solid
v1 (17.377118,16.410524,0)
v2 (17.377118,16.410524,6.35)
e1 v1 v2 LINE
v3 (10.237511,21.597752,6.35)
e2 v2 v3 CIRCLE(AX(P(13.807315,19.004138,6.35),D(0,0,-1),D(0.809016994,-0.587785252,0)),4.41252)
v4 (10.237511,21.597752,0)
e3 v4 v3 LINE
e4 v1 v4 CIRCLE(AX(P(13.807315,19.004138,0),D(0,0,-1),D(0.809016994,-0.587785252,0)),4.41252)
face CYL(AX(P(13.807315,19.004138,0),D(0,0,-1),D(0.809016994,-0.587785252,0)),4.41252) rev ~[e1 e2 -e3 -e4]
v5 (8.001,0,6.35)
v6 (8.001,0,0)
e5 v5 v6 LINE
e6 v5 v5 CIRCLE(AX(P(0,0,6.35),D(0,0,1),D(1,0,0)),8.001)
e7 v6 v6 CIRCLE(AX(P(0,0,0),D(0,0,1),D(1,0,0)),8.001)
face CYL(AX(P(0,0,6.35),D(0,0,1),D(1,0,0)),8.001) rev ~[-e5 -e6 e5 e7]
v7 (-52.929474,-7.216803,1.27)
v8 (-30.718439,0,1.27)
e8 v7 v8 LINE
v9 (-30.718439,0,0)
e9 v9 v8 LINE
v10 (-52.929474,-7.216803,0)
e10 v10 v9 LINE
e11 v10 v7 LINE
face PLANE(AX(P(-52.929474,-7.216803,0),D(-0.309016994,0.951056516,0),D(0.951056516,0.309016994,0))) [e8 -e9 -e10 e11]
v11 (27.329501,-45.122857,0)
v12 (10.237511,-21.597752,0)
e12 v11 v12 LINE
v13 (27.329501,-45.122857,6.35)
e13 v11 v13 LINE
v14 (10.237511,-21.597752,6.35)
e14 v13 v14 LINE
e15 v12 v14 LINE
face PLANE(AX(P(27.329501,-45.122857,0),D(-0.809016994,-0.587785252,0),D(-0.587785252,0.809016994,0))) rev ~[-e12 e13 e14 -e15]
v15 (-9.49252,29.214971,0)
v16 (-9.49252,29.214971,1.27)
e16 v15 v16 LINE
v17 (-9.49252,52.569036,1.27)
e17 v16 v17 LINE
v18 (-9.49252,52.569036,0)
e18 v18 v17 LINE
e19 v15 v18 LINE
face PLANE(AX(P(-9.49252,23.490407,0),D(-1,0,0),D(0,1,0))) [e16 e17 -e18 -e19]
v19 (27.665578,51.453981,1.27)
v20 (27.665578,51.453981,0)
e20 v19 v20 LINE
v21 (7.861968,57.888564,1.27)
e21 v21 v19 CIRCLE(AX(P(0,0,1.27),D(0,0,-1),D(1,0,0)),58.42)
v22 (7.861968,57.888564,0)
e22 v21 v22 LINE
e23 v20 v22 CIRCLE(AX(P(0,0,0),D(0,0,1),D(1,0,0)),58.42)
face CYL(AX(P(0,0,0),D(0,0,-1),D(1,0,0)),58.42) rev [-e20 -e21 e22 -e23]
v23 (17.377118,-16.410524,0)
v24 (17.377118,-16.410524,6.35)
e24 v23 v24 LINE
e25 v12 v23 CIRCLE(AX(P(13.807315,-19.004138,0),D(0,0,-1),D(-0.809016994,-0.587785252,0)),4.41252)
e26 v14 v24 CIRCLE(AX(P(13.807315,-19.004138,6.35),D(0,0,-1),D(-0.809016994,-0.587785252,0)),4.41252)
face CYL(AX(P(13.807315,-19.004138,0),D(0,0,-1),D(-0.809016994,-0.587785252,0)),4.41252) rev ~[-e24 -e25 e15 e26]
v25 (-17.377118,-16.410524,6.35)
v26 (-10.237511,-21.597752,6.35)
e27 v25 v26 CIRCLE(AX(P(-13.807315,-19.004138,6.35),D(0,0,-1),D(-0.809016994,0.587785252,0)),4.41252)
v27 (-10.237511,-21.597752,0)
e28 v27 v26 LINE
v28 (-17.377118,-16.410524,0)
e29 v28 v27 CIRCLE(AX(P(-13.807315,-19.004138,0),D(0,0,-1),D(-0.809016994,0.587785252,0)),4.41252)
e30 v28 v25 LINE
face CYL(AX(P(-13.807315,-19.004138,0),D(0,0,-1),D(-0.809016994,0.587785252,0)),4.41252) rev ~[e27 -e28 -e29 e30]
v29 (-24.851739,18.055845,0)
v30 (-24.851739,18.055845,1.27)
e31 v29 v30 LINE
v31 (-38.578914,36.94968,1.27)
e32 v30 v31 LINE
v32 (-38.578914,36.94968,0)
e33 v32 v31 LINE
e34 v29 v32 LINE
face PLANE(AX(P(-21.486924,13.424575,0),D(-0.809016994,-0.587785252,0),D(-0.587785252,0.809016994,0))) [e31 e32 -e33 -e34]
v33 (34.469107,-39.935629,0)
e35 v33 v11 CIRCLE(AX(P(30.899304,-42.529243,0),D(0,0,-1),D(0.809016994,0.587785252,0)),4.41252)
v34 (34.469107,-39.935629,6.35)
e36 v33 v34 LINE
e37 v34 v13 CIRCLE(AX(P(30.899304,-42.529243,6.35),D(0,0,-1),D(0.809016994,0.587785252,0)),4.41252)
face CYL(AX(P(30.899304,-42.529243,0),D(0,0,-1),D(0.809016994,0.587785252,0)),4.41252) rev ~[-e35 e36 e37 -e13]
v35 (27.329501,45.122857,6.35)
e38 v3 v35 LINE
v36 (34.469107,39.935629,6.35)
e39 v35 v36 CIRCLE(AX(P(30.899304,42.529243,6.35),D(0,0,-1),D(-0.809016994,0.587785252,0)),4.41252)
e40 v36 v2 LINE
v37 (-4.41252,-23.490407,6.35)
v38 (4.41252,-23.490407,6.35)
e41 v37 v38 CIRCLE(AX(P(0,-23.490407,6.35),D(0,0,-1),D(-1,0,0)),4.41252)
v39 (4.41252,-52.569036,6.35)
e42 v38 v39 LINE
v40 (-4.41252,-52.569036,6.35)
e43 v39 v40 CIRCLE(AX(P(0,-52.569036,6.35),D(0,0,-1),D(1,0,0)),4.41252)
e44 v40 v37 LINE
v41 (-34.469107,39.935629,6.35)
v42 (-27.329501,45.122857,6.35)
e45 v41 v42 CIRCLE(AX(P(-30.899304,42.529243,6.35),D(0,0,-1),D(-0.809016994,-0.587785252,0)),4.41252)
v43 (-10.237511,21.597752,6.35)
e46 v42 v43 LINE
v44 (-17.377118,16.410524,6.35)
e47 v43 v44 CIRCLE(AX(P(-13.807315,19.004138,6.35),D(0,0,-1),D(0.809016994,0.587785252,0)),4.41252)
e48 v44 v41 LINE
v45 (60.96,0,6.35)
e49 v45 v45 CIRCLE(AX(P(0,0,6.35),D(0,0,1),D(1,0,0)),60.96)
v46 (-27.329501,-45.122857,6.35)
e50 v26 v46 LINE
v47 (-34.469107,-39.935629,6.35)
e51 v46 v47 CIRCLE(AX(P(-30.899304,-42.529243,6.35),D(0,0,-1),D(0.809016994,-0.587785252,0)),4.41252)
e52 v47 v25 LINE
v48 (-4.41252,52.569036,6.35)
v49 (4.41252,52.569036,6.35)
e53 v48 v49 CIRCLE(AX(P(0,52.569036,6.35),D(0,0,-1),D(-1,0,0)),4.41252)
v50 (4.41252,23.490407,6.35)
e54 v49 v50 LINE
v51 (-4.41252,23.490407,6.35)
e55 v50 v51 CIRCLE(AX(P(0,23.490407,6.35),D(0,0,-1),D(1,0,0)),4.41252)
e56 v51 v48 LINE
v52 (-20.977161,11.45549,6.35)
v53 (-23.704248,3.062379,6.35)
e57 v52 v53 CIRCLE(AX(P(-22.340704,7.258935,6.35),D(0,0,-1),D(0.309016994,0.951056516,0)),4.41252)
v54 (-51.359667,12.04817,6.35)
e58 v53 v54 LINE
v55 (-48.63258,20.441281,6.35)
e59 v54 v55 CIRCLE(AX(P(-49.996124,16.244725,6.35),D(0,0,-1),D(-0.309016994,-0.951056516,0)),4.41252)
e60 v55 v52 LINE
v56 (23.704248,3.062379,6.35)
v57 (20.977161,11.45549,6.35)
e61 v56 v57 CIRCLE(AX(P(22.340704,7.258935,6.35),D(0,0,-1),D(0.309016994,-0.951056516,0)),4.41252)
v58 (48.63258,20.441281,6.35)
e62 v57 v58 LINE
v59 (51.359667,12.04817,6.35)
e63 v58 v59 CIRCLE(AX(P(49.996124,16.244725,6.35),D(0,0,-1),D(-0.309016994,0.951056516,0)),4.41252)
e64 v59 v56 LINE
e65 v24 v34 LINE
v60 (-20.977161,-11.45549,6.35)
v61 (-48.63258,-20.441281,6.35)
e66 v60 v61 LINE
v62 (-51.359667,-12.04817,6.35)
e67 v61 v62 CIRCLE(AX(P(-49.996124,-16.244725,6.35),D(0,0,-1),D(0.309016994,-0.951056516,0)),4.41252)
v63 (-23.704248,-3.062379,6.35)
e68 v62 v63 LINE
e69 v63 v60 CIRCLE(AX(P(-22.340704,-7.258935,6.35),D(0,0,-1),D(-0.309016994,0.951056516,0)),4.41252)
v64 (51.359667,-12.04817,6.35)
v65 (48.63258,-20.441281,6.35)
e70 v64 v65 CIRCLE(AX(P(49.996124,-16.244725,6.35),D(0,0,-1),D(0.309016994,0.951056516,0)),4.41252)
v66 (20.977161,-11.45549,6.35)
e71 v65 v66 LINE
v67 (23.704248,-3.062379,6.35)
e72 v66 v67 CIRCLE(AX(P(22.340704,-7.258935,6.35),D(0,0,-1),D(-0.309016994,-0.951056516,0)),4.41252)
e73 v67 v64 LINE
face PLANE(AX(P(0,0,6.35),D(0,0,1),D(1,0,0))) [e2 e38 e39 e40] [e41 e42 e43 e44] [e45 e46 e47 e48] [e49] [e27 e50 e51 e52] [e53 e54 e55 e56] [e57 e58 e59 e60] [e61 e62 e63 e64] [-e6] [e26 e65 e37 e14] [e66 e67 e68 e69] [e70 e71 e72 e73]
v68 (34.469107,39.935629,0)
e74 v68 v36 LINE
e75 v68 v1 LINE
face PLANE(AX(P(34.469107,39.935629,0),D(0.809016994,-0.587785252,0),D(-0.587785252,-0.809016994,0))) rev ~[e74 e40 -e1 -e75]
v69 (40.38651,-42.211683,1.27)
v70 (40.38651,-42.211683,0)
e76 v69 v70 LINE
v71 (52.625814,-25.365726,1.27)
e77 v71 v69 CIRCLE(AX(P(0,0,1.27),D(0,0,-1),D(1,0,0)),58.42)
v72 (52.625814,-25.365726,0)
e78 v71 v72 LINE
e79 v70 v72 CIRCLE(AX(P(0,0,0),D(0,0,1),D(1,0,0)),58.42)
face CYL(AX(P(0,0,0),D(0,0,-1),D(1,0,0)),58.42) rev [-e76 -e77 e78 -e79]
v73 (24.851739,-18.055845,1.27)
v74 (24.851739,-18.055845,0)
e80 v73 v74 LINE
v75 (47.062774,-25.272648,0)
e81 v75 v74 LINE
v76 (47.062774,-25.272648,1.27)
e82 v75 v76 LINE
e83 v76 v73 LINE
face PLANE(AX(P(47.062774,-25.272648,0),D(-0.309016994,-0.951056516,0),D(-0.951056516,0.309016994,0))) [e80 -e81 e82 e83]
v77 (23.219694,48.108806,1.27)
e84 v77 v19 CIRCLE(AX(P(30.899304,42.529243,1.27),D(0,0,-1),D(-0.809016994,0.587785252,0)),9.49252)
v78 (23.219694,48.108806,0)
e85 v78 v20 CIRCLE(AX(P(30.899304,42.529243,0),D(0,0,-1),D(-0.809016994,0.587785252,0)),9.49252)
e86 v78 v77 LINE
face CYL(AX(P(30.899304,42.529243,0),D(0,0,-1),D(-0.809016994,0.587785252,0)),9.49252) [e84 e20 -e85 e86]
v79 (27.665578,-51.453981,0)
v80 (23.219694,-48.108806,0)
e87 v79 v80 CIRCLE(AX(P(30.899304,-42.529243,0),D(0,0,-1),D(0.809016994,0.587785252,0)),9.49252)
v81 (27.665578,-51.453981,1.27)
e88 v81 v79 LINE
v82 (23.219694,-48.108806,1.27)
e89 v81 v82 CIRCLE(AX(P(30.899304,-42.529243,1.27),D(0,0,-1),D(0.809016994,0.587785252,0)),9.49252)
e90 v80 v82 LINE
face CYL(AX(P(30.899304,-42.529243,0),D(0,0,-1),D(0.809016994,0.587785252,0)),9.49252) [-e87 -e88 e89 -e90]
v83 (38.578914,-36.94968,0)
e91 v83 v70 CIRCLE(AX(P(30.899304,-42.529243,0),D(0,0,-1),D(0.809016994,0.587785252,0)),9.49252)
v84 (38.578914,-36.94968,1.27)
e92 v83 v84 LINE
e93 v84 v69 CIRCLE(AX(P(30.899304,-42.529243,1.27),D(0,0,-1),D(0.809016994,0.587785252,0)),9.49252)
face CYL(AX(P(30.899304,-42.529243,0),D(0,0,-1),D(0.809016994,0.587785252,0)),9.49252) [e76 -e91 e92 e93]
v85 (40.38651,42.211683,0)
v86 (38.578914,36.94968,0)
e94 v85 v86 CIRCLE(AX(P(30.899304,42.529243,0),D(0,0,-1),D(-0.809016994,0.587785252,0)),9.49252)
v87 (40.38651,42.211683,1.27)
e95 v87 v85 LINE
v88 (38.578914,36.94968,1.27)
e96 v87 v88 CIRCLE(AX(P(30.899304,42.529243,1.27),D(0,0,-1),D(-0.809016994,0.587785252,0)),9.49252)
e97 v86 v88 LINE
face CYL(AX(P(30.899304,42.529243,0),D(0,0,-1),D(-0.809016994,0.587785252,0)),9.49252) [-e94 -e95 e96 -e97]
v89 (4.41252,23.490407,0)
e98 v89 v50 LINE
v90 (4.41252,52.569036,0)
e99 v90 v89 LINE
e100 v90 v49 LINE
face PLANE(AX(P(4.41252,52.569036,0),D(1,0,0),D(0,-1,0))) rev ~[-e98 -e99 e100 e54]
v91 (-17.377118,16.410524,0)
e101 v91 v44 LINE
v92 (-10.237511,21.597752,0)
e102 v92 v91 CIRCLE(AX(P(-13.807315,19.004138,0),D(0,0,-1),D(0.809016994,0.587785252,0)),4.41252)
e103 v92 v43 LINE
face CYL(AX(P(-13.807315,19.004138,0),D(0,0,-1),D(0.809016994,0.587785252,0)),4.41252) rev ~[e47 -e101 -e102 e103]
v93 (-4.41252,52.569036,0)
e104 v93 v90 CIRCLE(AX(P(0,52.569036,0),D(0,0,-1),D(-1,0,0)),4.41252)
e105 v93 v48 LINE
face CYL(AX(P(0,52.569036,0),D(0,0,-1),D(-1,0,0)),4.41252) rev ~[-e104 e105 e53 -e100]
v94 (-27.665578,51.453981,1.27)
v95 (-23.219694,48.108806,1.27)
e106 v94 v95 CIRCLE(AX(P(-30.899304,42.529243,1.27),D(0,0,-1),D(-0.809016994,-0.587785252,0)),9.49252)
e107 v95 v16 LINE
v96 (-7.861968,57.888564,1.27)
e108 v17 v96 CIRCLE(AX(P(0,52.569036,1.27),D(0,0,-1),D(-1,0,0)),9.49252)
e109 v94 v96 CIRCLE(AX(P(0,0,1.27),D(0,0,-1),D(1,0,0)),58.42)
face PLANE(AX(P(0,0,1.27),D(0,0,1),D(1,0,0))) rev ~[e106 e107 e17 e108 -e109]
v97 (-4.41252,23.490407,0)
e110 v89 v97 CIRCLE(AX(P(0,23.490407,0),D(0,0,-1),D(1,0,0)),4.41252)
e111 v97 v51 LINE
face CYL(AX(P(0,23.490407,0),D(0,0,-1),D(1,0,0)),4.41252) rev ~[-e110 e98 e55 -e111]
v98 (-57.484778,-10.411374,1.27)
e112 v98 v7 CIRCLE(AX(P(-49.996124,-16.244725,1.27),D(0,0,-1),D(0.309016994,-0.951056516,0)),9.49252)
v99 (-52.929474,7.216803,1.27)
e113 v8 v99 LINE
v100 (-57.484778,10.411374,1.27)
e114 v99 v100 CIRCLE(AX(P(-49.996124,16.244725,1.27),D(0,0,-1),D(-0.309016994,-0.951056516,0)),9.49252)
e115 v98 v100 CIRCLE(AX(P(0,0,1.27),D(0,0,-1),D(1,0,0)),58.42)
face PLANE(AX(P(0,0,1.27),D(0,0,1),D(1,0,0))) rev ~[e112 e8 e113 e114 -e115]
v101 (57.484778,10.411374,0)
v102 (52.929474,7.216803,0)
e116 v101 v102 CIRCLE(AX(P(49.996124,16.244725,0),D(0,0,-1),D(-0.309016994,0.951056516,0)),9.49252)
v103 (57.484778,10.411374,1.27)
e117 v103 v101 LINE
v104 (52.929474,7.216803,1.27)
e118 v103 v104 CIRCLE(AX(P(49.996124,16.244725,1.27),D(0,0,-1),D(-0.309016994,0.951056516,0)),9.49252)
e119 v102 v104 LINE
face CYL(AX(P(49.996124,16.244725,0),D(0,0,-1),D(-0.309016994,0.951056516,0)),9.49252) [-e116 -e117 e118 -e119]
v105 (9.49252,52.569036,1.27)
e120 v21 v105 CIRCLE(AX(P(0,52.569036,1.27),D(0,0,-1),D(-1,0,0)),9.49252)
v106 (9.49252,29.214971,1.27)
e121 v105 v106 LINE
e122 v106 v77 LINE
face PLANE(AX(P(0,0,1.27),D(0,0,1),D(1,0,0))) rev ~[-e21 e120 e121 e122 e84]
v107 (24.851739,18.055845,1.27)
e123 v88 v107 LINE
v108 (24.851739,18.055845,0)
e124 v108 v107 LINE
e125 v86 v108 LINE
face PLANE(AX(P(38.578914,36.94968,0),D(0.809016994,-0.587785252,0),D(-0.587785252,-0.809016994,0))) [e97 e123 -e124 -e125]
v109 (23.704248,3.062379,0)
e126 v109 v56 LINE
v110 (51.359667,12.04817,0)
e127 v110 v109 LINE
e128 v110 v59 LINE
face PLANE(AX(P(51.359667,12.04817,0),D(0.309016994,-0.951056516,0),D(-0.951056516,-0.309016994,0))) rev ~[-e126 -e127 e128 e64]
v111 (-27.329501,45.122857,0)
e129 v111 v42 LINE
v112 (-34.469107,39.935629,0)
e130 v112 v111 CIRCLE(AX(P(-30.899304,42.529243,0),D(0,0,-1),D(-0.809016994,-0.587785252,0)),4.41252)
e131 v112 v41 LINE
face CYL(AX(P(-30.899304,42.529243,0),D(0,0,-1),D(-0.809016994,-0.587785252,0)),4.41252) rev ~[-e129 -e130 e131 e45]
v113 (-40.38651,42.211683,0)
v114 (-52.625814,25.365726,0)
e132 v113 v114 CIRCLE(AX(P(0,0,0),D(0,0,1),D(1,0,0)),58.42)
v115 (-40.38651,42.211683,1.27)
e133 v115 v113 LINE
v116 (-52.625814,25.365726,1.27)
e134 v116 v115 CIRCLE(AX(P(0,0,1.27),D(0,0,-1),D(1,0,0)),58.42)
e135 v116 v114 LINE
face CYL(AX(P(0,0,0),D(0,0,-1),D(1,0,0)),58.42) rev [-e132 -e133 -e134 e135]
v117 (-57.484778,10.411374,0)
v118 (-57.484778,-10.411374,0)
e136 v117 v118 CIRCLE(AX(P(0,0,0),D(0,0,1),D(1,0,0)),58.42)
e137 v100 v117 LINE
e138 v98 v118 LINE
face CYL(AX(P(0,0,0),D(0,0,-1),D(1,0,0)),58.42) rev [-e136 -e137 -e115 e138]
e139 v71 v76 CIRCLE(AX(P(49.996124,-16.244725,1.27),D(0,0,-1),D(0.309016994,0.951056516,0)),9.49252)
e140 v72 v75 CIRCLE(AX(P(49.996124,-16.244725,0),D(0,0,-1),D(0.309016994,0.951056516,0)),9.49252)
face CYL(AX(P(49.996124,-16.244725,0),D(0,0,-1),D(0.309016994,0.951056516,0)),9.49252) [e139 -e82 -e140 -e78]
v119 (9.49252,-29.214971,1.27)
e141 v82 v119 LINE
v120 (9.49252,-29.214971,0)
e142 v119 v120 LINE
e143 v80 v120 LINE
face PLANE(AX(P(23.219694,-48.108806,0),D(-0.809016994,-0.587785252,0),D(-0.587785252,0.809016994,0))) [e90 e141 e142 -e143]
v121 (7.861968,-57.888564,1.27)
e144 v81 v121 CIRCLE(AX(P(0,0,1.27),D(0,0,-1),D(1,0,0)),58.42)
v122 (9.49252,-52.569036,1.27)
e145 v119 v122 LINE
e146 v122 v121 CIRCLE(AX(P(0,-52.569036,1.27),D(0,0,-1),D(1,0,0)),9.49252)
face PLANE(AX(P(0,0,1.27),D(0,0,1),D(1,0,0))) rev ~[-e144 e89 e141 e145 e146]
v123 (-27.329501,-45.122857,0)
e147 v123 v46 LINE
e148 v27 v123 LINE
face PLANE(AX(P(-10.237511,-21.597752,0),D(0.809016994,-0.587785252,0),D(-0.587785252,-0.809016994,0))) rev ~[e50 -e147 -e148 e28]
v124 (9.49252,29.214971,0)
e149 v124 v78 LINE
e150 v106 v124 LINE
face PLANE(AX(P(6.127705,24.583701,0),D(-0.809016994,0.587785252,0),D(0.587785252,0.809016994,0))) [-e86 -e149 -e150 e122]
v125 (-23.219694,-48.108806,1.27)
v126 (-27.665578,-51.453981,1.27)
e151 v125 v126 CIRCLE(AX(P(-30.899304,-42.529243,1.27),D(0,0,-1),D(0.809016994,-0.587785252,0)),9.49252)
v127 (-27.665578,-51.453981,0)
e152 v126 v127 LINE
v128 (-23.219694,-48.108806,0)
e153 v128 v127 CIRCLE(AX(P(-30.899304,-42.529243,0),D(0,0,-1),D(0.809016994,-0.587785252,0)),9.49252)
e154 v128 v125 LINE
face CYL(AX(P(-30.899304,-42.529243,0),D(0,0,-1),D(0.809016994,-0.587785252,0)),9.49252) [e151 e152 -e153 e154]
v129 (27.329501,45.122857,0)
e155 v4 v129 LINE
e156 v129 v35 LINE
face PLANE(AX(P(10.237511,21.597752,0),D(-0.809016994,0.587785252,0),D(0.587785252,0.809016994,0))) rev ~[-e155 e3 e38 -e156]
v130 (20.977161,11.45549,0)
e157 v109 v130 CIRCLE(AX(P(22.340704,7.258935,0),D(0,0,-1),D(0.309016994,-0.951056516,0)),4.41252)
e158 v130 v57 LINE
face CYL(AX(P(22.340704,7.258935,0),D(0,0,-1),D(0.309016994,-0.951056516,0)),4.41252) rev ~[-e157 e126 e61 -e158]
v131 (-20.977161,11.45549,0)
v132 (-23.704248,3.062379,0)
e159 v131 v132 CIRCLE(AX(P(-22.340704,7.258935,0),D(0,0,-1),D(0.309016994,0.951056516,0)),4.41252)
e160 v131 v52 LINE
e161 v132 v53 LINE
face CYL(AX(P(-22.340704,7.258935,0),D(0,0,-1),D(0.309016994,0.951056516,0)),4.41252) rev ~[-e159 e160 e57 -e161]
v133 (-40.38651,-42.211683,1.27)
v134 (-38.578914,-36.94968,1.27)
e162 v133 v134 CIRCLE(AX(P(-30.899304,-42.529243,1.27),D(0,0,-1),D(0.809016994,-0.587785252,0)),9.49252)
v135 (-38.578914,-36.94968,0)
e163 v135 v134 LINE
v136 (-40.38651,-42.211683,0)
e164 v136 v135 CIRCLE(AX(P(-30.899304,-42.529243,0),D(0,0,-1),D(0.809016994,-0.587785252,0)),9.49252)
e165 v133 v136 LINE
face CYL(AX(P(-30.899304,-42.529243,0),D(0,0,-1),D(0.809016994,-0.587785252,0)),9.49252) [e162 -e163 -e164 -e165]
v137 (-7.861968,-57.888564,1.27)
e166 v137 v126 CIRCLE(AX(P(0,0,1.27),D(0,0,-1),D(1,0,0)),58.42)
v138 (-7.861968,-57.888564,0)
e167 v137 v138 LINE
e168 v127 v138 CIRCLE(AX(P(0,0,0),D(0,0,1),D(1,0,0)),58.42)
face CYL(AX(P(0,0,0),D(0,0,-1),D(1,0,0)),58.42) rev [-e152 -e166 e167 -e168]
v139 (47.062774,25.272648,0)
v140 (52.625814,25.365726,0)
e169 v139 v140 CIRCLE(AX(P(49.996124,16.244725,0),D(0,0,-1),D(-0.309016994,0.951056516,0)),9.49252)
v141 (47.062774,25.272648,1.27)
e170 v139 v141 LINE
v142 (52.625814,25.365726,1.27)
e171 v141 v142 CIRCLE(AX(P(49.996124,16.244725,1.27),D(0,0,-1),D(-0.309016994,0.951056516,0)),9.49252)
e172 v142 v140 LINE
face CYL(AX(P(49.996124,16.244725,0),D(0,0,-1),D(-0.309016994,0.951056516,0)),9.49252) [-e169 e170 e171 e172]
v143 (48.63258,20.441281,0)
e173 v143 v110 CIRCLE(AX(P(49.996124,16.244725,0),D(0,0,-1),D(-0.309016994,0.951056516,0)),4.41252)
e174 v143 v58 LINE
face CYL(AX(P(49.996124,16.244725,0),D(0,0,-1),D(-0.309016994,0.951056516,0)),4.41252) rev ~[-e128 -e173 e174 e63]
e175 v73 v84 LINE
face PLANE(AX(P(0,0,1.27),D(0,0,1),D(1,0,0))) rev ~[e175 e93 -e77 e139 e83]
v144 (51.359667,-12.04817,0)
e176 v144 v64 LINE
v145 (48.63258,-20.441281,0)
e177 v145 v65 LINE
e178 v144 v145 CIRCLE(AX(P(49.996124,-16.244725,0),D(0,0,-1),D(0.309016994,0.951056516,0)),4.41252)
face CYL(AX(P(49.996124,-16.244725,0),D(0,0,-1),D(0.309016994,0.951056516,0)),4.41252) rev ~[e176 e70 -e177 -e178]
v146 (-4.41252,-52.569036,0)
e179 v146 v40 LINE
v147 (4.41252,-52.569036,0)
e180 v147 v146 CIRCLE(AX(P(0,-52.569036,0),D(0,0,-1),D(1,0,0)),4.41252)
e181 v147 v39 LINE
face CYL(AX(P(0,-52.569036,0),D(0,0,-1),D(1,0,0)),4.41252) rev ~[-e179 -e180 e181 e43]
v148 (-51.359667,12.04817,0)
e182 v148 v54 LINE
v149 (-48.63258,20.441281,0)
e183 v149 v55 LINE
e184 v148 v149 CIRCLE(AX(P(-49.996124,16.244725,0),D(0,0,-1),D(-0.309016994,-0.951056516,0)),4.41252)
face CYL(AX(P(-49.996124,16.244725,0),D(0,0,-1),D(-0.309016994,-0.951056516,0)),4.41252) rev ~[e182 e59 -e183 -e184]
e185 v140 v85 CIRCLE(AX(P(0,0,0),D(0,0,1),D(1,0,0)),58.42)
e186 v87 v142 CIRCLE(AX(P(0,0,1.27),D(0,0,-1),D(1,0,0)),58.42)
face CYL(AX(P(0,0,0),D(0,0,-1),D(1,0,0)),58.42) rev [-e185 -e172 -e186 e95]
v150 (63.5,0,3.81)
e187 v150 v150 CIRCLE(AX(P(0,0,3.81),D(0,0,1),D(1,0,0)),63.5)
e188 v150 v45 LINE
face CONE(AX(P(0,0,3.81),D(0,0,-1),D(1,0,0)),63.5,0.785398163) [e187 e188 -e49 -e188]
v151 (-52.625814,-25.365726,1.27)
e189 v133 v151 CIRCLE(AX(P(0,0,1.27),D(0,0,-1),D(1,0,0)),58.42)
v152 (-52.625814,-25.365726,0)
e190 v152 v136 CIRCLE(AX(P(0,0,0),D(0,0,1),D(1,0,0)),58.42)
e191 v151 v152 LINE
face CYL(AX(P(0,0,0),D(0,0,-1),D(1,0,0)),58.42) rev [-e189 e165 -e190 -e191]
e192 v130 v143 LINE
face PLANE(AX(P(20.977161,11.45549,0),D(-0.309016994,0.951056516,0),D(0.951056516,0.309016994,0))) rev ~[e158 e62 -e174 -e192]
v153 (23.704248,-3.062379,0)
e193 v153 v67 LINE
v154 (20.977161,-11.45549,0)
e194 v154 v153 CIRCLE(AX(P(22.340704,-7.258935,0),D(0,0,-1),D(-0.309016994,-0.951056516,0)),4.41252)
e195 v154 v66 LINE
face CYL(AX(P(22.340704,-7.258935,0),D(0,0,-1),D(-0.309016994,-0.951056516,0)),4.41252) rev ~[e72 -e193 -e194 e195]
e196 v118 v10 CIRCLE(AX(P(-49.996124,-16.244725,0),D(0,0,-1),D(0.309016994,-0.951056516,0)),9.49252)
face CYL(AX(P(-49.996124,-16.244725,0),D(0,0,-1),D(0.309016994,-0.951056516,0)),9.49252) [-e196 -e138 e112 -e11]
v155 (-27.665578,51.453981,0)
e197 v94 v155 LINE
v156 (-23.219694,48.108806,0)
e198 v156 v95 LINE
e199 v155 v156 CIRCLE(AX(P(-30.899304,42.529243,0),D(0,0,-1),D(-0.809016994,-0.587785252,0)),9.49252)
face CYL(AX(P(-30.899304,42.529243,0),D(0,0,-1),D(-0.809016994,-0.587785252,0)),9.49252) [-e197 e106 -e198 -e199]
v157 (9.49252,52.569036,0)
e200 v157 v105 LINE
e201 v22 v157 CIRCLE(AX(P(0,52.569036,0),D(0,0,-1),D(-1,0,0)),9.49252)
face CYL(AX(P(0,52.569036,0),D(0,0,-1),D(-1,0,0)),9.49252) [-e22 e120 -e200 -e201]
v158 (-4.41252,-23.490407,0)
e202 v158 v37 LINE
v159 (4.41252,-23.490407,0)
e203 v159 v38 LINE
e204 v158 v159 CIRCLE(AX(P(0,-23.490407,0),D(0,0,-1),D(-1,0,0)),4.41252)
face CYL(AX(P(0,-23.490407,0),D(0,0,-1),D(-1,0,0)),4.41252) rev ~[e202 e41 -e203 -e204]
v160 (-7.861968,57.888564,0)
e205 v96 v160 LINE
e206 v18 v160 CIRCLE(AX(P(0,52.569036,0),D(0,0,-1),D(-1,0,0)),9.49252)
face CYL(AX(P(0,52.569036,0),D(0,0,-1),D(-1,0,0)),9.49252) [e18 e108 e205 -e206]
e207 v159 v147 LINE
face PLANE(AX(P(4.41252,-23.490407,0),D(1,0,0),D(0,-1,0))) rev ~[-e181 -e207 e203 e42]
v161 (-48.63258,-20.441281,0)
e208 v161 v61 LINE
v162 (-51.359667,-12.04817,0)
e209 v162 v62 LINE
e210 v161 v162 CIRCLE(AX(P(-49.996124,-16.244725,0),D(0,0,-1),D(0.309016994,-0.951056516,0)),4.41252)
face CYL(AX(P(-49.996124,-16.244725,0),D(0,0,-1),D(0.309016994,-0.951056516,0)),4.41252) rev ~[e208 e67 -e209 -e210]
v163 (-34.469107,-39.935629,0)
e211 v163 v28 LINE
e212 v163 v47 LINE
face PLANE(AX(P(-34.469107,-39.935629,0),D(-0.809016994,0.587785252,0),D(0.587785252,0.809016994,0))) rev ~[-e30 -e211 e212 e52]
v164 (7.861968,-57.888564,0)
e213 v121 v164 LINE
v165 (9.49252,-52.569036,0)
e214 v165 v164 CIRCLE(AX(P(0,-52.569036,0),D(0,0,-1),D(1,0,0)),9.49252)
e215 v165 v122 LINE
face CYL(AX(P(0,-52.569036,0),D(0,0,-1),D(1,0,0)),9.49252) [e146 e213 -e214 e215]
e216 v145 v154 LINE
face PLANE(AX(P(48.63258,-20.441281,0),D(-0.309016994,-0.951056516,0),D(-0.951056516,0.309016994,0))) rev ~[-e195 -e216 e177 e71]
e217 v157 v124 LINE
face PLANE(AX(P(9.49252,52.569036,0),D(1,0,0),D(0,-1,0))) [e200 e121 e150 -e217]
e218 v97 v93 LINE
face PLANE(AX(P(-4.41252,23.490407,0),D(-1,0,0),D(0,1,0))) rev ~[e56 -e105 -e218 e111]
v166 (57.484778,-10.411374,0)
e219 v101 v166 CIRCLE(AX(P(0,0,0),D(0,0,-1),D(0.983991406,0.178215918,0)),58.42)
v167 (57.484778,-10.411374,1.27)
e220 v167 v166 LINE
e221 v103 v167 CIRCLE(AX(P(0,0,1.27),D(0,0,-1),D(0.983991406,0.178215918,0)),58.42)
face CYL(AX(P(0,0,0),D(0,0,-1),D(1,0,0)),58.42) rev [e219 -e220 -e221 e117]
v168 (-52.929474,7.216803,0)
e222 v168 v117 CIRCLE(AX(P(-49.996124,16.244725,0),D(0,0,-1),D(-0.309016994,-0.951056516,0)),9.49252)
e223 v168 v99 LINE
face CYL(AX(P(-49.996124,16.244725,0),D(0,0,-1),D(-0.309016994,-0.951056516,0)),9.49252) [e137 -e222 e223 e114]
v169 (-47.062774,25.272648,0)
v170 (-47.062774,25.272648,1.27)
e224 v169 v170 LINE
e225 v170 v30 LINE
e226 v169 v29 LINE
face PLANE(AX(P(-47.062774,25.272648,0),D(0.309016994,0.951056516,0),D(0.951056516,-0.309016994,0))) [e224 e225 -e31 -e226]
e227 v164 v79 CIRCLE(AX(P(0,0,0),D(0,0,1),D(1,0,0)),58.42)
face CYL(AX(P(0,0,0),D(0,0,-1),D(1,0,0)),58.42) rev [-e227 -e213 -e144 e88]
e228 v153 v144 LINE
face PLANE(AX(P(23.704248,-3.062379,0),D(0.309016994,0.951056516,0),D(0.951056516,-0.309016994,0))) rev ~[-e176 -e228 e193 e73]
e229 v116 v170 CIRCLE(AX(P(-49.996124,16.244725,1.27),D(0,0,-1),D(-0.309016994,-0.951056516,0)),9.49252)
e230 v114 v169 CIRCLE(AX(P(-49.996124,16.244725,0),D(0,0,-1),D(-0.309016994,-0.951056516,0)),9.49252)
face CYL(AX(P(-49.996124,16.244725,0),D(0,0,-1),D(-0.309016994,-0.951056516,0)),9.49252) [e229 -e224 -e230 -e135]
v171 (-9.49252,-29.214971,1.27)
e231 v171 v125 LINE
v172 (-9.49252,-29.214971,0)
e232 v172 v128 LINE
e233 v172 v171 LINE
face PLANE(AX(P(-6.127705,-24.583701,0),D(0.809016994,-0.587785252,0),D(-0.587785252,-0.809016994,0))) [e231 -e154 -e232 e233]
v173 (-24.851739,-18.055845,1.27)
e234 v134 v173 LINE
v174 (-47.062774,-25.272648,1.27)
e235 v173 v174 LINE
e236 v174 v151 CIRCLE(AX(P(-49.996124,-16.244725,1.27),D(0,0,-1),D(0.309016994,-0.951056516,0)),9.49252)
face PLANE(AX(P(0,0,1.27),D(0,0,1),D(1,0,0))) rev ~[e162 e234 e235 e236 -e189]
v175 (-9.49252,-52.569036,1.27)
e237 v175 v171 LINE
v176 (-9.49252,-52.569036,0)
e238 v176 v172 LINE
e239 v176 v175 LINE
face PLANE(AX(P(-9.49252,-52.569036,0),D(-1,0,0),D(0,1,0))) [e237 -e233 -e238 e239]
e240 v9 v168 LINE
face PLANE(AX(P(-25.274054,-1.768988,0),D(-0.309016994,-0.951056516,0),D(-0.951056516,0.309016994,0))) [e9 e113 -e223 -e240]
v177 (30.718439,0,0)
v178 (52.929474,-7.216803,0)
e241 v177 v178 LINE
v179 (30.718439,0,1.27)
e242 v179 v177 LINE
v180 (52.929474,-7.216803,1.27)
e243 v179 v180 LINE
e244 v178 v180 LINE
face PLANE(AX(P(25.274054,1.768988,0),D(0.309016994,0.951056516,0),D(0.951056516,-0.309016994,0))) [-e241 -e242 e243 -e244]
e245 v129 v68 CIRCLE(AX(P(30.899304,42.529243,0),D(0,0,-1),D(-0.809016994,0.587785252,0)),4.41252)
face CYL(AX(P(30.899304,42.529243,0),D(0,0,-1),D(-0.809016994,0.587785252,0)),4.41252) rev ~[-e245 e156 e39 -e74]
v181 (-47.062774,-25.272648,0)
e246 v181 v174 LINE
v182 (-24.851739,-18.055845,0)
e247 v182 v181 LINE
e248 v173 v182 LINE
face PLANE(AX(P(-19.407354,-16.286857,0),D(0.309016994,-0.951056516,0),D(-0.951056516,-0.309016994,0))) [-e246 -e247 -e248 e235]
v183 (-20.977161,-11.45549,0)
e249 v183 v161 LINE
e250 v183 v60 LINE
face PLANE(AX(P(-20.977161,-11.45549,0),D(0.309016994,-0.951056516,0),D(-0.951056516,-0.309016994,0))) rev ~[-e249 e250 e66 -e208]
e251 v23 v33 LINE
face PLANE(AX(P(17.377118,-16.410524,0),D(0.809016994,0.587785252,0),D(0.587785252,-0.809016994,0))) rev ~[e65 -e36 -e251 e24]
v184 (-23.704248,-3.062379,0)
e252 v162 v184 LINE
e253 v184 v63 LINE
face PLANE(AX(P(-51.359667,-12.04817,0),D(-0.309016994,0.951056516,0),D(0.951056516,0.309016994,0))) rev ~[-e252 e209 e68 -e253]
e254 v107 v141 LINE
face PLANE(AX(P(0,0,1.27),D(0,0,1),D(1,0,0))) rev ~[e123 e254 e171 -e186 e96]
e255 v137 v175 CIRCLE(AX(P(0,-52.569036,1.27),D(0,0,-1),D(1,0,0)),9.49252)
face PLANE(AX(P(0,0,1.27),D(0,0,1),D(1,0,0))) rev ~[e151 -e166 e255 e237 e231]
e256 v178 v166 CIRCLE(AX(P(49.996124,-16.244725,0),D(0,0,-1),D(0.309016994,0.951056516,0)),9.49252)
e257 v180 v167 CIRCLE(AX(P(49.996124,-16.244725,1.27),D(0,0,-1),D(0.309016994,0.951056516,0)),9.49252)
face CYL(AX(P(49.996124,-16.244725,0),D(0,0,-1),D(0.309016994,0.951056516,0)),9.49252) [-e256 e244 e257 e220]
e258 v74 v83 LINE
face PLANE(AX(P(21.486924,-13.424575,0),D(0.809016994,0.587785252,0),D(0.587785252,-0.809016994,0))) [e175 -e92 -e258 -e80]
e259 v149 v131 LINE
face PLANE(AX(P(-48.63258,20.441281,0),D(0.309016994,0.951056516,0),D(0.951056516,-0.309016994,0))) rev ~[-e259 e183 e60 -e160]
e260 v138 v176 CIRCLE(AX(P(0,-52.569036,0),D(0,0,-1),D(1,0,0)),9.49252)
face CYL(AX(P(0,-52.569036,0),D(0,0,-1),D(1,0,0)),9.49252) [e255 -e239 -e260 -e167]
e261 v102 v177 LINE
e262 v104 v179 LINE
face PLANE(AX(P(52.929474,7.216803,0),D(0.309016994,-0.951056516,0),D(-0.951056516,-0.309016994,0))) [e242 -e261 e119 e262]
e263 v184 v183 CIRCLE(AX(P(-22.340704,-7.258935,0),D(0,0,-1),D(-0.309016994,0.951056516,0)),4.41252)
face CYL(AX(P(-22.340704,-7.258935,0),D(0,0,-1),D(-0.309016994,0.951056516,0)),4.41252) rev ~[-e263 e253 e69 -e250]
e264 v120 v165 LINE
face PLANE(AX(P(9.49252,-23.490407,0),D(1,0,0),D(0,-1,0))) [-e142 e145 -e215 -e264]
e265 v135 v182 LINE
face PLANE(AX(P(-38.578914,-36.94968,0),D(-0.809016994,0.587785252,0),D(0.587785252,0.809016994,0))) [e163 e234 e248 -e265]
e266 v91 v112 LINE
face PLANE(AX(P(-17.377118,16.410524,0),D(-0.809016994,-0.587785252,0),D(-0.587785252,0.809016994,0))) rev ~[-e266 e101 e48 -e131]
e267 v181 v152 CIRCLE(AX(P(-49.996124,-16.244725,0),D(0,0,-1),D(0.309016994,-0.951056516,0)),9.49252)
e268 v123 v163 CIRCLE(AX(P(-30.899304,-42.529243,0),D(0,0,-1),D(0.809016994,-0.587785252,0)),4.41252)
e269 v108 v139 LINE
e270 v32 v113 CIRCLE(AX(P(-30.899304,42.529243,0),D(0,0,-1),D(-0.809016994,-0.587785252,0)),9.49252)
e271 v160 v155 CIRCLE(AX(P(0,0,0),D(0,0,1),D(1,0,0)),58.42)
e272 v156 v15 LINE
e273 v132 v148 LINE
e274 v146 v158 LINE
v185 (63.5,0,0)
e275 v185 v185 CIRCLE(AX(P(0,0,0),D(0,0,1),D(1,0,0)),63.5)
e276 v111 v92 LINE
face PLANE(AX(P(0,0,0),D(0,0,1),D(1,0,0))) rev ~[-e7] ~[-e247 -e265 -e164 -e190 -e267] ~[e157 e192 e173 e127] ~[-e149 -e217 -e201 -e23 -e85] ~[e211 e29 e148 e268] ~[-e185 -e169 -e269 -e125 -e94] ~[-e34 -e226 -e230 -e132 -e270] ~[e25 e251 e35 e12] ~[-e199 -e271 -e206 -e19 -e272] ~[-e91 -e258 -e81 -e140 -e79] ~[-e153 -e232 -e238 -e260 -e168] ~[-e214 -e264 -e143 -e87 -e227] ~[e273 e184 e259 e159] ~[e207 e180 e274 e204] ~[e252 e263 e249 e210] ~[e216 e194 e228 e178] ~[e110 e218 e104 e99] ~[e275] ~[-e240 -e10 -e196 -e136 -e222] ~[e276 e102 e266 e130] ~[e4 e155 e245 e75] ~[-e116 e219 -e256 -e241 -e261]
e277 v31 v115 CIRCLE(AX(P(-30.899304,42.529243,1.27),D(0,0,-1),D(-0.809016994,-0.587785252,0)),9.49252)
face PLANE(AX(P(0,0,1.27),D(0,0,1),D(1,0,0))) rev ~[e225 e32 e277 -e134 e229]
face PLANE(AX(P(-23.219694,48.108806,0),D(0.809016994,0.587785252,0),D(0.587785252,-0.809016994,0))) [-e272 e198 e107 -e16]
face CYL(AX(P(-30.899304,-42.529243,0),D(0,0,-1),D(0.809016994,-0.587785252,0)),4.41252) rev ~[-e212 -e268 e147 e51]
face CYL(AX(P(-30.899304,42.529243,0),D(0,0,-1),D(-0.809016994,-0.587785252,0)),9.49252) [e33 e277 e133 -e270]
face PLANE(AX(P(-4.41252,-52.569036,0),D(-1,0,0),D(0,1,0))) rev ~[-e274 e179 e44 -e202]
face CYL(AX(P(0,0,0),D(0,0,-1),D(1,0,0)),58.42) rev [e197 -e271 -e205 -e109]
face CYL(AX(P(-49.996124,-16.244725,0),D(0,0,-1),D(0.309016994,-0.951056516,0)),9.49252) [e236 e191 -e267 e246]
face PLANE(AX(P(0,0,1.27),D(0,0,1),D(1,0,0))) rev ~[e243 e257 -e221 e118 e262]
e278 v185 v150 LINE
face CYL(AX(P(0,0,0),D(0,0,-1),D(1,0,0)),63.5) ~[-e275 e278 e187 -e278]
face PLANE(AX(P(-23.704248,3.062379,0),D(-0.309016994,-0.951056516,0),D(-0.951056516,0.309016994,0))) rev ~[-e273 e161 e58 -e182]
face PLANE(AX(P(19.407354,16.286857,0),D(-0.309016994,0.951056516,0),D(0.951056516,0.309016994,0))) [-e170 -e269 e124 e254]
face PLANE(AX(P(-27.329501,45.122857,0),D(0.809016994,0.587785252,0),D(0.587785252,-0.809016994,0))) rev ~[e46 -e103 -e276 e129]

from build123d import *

# Parameters (mm, degrees)
F0_R     = 63.5
F0_R_2   = 12.7
F1_DEPTH = 6.35
F2_T     = 5.08
F3_SIZE  = 2.54
F4_R     = 12.7
F4_R_2   = 8.001
F5_DEPTH = 6.35


# Not quite as in the source:
# - a shell that OpenCascade refuses in one call is made with other operations: the cavity is built on its own and cut out


with BuildPart() as f1:
    # F0 (on Top) → F1 (new body)
    with BuildSketch(Plane.XY):
        Circle(F0_R)
        with BuildLine():
            ThreePointArc((4.4125195695, -52.5690356897), (0, -56.9815552592), (-4.4125195695, -52.5690356897))
            Line((-4.4125195695, -52.5690356897), (-4.4125195695, -23.4904065728))
            ThreePointArc((-4.4125195695, -23.4904065728), (0, -19.0778870033), (4.4125195695, -23.4904065728))
            Line((4.4125195695, -23.4904065728), (4.4125195695, -52.5690356897))
        make_face(mode=Mode.SUBTRACT)
        with BuildLine():
            ThreePointArc((-48.6325804131, -20.4412808959), (-54.1926794379, -17.608268941), (-51.359667483, -12.0481699162))
            Line((-51.359667483, -12.0481699162), (-23.7042477765, -3.0623793459))
            ThreePointArc((-23.7042477765, -3.0623793459), (-18.1441487516, -5.8953913008), (-20.9771607065, -11.4554903256))
            Line((-20.9771607065, -11.4554903256), (-48.6325804131, -20.4412808959))
        make_face(mode=Mode.SUBTRACT)
        with BuildLine():
            ThreePointArc((-27.3295005859, -45.1228571793), (-33.4929178341, -46.0990465706), (-34.4691072254, -39.9356293225))
            Line((-34.4691072254, -39.9356293225), (-17.3771178736, -16.4105241938))
            ThreePointArc((-17.3771178736, -16.4105241938), (-11.2137006254, -15.4343348024), (-10.2375112341, -21.5977520506))
            Line((-10.2375112341, -21.5977520506), (-27.3295005859, -45.1228571793))
        make_face(mode=Mode.SUBTRACT)
        with BuildLine():
            ThreePointArc((34.4691072254, -39.9356293225), (33.4929178341, -46.0990465706), (27.3295005859, -45.1228571793))
            Line((27.3295005859, -45.1228571793), (10.2375112341, -21.5977520506))
            ThreePointArc((10.2375112341, -21.5977520506), (11.2137006254, -15.4343348024), (17.3771178736, -16.4105241938))
            Line((17.3771178736, -16.4105241938), (34.4691072254, -39.9356293225))
        make_face(mode=Mode.SUBTRACT)
        with BuildLine():
            ThreePointArc((51.359667483, -12.0481699162), (54.1926794379, -17.608268941), (48.6325804131, -20.4412808959))
            Line((48.6325804131, -20.4412808959), (20.9771607065, -11.4554903256))
            ThreePointArc((20.9771607065, -11.4554903256), (18.1441487516, -5.8953913008), (23.7042477765, -3.0623793459))
            Line((23.7042477765, -3.0623793459), (51.359667483, -12.0481699162))
        make_face(mode=Mode.SUBTRACT)
        with BuildLine():
            ThreePointArc((-51.359667483, 12.0481699162), (-54.1926794379, 17.608268941), (-48.6325804131, 20.4412808959))
            Line((-48.6325804131, 20.4412808959), (-20.9771607065, 11.4554903256))
            ThreePointArc((-20.9771607065, 11.4554903256), (-18.1441487516, 5.8953913008), (-23.7042477765, 3.0623793459))
            Line((-23.7042477765, 3.0623793459), (-51.359667483, 12.0481699162))
        make_face(mode=Mode.SUBTRACT)
        with BuildLine():
            ThreePointArc((-34.4691072254, 39.9356293225), (-33.4929178341, 46.0990465706), (-27.3295005859, 45.1228571793))
            Line((-27.3295005859, 45.1228571793), (-10.2375112341, 21.5977520506))
            ThreePointArc((-10.2375112341, 21.5977520506), (-11.2137006254, 15.4343348024), (-17.3771178736, 16.4105241938))
            Line((-17.3771178736, 16.4105241938), (-34.4691072254, 39.9356293225))
        make_face(mode=Mode.SUBTRACT)
        Circle(F0_R_2, mode=Mode.SUBTRACT)
        with BuildLine():
            ThreePointArc((27.3295005859, 45.1228571793), (33.4929178341, 46.0990465706), (34.4691072254, 39.9356293225))
            Line((34.4691072254, 39.9356293225), (17.3771178736, 16.4105241938))
            ThreePointArc((17.3771178736, 16.4105241938), (11.2137006254, 15.4343348024), (10.2375112341, 21.5977520506))
            Line((10.2375112341, 21.5977520506), (27.3295005859, 45.1228571793))
        make_face(mode=Mode.SUBTRACT)
        with BuildLine():
            ThreePointArc((48.6325804131, 20.4412808959), (54.1926794379, 17.608268941), (51.359667483, 12.0481699162))
            Line((51.359667483, 12.0481699162), (23.7042477765, 3.0623793459))
            ThreePointArc((23.7042477765, 3.0623793459), (18.1441487516, 5.8953913008), (20.9771607065, 11.4554903256))
            Line((20.9771607065, 11.4554903256), (48.6325804131, 20.4412808959))
        make_face(mode=Mode.SUBTRACT)
        with BuildLine():
            Line((4.4125195695, 52.5690356897), (4.4125195695, 23.4904065728))
            ThreePointArc((4.4125195695, 23.4904065728), (0, 19.0778870033), (-4.4125195695, 23.4904065728))
            Line((-4.4125195695, 23.4904065728), (-4.4125195695, 52.5690356897))
            ThreePointArc((-4.4125195695, 52.5690356897), (0, 56.9815552592), (4.4125195695, 52.5690356897))
        make_face(mode=Mode.SUBTRACT)
    extrude(amount=F1_DEPTH)

    # F2: shell of thickness 5.08, made by hand


with BuildPart() as f2_core1:
    # F2_t2: copy of F1
    add(f1.part)

    # the walls: a layer under each face that stays
    f2_faces = [f2_core1.faces().sort_by_distance(p)[0] for p in [
        (-63.5, 0, 3.175),
        (4.4125195695, -38.0297211313, 3.175),
        (0, -56.9815552592, 3.175),
        (-4.4125195695, -38.0297211313, 3.175),
        (0, -19.0778870033, 3.175),
        (-18.1441487516, -5.8953913008, 3.175),
        (-34.8048705598, -15.9483856108, 3.175),
        (-54.1926794379, -17.608268941, 3.175),
        (-37.5319576298, -7.555274631, 3.175),
        (-18.78350591, -33.3603046149, 3.175),
        (-33.4929178341, -46.0990465706, 3.175),
        (-25.9231125495, -28.1730767581, 3.175),
        (-11.2137006254, -15.4343348024, 3.175),
        (11.2137006254, -15.4343348024, 3.175),
        (25.9231125495, -28.1730767581, 3.175),
        (33.4929178341, -46.0990465706, 3.175),
        (18.78350591, -33.3603046149, 3.175),
        (18.1441487516, -5.8953913008, 3.175),
        (37.5319576298, -7.555274631, 3.175),
        (54.1926794379, -17.608268941, 3.175),
        (34.8048705598, -15.9483856108, 3.175),
        (-37.5319576298, 7.555274631, 3.175),
        (-54.1926794379, 17.608268941, 3.175),
        (-34.8048705598, 15.9483856108, 3.175),
        (-18.1441487516, 5.8953913008, 3.175),
        (-25.9231125495, 28.1730767581, 3.175),
        (-33.4929178341, 46.0990465706, 3.175),
        (-18.78350591, 33.3603046149, 3.175),
        (-11.2137006254, 15.4343348024, 3.175),
        (-12.7, 0, 3.175),
        (11.2137006254, 15.4343348024, 3.175),
        (18.78350591, 33.3603046149, 3.175),
        (33.4929178341, 46.0990465706, 3.175),
        (25.9231125495, 28.1730767581, 3.175),
        (18.1441487516, 5.8953913008, 3.175),
        (34.8048705598, 15.9483856108, 3.175),
        (54.1926794379, 17.608268941, 3.175),
        (37.5319576298, 7.555274631, 3.175),
        (0, 19.0778870033, 3.175),
        (-4.4125195695, 38.0297211313, 3.175),
        (0, 56.9815552592, 3.175),
        (4.4125195695, 38.0297211313, 3.175),
        (-42.3333333333, -42.3333333333, 6.35),
    ]]
    thicken(f2_faces, amount=-F2_T, mode=Mode.SUBTRACT)


with BuildPart() as f1_1:
    add(f1.part)

    # what is left inside the walls is the cavity
    f2_cavity = [f2_core1.part.solids().sort_by_distance(p)[0] for p in [
        (17.763773, -48.3307, 1.2192),
        (38.738777, -34.159737, 1.2192),
        (44.569219, -3.470458, 1.2192),
        (38.738777, 26.107791, 1.2192),
        (12.812871, 48.3307, 1.2192),
        (-22.714676, 48.3307, 0.0508),
        (-38.738777, 26.107791, 0.0508),
        (-44.569219, -3.470458, 0.0508),
        (-38.738777, -34.159737, 1.2192),
        (-17.763773, -48.3307, 0.0508),
    ]]
    add(f2_cavity, mode=Mode.SUBTRACT)

    # F3
    f3_edges = [f1_1.edges().sort_by_distance(p)[0] for p in [
        (-63.5, 0, 6.35),
    ]]
    chamfer(f3_edges, length=F3_SIZE)

    # F4 (on face) → F5 (join)
    with BuildSketch(Plane.XY.offset(6.35)):
        Circle(F4_R)
        Circle(F4_R_2, mode=Mode.SUBTRACT)
    extrude(amount=-F5_DEPTH)


solid = f1_1.part
